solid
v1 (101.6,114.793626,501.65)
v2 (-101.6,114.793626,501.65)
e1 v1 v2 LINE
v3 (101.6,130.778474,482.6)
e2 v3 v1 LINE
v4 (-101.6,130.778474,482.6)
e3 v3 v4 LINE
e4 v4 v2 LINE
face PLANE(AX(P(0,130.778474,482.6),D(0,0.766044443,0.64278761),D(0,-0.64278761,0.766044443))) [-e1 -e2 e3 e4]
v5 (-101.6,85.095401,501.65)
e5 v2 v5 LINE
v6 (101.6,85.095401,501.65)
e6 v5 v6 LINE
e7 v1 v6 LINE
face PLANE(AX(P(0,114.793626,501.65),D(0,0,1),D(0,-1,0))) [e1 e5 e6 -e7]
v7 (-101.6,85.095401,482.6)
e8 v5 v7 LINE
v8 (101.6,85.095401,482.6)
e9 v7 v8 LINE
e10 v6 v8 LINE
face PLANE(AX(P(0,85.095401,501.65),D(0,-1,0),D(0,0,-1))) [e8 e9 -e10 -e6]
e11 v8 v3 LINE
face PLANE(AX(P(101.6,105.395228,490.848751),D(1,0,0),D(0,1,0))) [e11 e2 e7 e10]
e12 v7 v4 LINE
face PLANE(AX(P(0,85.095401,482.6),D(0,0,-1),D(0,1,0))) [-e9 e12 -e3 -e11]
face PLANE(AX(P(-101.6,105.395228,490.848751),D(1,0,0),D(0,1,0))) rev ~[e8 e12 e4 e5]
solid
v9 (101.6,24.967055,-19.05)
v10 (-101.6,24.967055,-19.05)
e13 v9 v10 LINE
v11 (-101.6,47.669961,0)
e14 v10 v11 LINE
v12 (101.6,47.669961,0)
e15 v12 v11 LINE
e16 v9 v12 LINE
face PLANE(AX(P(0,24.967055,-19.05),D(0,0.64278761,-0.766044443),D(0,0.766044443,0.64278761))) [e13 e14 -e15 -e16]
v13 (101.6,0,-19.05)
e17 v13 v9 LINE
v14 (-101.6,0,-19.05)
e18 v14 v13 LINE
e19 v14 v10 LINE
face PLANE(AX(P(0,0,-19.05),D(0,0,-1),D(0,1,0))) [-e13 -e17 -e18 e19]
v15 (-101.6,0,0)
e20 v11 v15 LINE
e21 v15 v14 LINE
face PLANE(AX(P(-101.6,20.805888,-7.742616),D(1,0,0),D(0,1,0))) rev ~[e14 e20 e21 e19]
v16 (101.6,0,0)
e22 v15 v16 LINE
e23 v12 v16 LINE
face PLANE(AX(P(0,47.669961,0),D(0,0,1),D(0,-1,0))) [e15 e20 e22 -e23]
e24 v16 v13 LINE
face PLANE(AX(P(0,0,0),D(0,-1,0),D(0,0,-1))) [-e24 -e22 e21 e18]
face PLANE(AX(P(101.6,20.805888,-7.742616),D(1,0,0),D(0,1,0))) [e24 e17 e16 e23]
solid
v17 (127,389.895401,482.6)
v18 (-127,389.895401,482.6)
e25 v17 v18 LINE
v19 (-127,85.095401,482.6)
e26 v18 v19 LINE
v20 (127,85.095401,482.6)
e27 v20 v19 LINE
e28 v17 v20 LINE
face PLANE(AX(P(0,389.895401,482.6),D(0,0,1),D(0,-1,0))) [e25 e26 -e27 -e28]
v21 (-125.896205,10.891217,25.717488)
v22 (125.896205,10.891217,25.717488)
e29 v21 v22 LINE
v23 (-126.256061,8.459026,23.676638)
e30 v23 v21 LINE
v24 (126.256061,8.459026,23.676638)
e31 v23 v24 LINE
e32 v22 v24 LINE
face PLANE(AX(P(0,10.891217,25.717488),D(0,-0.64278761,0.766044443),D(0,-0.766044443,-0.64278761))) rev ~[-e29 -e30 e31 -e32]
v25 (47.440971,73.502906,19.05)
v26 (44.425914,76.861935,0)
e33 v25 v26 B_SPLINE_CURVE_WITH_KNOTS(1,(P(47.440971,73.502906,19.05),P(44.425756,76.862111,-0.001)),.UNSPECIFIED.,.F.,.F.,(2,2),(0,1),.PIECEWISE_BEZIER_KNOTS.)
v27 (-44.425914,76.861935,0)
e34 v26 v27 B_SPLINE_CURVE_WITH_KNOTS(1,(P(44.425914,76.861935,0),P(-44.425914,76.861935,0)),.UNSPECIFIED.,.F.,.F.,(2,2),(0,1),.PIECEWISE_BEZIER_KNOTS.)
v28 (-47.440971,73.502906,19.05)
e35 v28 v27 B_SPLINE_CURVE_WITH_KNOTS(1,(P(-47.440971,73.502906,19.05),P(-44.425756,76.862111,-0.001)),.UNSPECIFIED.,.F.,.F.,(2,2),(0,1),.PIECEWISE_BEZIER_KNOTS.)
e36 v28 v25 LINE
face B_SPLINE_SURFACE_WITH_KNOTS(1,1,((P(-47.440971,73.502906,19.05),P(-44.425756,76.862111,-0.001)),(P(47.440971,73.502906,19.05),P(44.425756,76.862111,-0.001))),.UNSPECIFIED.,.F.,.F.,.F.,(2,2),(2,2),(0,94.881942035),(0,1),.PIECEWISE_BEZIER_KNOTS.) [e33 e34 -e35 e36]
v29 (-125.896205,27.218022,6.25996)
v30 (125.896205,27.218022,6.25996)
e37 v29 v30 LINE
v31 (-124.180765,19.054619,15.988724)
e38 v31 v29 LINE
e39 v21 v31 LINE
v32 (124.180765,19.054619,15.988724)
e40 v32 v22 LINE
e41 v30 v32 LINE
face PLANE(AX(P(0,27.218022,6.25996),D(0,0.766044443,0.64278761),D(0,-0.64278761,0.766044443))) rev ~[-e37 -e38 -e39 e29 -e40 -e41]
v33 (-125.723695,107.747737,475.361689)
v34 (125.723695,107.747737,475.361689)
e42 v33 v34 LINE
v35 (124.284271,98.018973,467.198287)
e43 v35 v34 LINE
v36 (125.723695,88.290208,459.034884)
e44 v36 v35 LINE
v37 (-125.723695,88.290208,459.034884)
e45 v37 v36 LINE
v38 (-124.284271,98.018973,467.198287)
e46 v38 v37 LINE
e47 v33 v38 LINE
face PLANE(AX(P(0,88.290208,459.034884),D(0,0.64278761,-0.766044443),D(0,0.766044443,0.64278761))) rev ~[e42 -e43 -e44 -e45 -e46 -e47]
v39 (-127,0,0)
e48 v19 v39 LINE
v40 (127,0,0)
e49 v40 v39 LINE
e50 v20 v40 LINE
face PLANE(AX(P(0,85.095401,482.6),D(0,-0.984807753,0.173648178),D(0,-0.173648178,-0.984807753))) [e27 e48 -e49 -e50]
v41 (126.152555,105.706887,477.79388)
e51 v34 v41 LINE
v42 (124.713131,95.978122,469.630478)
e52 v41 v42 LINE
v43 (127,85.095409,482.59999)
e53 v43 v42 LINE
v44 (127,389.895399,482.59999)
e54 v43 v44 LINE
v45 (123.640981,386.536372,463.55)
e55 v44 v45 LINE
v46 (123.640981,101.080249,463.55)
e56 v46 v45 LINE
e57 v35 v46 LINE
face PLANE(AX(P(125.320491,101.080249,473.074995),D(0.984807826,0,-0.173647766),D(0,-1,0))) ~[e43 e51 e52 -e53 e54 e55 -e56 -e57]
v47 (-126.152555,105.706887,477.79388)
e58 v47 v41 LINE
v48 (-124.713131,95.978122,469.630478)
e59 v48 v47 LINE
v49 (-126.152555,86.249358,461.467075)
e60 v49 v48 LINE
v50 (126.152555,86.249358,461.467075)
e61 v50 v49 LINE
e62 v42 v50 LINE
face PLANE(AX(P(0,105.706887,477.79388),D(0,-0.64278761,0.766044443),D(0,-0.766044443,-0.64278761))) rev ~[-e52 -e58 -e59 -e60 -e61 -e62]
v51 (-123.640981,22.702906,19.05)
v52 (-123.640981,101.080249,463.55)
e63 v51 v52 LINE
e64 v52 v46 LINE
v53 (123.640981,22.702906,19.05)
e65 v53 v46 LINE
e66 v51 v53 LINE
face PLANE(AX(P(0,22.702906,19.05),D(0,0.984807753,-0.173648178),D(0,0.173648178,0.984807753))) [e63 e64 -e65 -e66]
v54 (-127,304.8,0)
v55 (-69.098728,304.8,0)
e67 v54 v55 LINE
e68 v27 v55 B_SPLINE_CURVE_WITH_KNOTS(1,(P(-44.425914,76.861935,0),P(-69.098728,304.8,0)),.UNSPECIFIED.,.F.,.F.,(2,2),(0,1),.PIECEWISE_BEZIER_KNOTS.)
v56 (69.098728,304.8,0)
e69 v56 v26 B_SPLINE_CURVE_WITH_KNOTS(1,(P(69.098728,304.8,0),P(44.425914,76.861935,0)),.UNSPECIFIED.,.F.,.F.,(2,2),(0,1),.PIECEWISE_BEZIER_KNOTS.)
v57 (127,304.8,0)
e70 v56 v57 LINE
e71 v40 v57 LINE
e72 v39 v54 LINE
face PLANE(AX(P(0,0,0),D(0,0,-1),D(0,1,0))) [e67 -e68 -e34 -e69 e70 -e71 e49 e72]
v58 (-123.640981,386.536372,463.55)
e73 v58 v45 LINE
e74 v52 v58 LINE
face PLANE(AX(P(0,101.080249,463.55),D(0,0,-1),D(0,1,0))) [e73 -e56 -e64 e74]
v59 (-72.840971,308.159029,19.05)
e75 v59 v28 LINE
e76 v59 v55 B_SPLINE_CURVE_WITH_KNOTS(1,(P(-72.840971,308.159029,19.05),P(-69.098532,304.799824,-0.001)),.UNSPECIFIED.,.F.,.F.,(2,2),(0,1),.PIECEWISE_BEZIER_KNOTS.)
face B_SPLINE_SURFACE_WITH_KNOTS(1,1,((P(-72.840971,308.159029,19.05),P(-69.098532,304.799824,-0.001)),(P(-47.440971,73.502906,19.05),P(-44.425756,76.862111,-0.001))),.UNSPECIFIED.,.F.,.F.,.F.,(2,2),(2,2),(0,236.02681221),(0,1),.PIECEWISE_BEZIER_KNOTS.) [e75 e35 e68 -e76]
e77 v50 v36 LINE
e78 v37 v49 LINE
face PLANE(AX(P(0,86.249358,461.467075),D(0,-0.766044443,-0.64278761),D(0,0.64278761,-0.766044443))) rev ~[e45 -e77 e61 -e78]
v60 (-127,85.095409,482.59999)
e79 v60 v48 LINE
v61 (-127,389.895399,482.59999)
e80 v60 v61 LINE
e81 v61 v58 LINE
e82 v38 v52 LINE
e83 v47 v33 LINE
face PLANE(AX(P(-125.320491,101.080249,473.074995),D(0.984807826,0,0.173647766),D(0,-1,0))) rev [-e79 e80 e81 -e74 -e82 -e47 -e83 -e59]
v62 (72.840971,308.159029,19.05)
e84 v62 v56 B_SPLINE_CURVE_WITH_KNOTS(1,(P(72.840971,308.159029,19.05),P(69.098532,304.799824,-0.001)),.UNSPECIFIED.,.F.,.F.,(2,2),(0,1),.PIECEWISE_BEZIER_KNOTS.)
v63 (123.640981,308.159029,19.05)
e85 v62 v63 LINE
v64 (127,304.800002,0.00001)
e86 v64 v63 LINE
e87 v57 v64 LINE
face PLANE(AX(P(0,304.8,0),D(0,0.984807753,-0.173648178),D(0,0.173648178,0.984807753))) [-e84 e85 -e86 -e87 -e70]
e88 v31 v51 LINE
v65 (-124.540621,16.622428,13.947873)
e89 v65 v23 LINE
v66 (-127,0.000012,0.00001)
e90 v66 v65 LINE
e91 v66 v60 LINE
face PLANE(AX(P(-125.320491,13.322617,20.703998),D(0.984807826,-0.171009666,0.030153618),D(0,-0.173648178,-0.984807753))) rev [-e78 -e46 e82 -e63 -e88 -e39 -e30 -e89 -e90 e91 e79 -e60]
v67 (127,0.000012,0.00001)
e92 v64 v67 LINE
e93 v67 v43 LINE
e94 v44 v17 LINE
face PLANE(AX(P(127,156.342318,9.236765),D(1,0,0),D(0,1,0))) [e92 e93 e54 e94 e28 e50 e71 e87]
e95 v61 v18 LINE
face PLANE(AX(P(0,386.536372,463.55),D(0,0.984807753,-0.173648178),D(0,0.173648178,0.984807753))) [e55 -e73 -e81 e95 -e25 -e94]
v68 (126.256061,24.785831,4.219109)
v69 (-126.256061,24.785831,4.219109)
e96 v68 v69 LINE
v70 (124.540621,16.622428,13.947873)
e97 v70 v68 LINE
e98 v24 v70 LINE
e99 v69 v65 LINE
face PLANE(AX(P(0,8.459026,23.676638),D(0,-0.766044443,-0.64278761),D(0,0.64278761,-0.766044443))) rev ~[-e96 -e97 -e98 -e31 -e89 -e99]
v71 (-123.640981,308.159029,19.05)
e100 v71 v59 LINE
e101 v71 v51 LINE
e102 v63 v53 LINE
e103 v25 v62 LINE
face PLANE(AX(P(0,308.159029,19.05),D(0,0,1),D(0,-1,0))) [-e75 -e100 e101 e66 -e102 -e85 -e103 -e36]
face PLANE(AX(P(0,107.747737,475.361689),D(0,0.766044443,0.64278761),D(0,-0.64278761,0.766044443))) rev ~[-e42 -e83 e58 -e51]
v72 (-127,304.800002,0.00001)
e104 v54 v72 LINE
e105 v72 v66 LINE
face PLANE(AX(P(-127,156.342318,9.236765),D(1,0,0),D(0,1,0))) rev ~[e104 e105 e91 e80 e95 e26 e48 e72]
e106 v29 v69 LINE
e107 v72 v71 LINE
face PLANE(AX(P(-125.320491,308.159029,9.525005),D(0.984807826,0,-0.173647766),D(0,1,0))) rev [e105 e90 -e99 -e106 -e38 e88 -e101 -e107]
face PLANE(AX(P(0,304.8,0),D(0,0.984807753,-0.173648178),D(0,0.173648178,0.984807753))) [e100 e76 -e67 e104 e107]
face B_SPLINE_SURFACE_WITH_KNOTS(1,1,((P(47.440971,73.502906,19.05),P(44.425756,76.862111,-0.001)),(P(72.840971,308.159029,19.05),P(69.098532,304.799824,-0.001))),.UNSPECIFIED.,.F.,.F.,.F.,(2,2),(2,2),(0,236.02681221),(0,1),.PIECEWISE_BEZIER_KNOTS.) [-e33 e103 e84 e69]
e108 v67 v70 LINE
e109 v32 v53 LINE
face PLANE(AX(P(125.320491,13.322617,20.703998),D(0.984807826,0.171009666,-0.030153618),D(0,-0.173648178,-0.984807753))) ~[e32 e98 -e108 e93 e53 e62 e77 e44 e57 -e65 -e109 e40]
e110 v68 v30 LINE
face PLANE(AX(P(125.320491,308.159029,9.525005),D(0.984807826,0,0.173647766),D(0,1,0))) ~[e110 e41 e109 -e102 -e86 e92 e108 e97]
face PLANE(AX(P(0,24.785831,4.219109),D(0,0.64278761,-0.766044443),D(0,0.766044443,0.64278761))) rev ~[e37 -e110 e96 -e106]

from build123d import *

# Parameters (mm, degrees)
F1_DEPTH      = 127
F2_SIZE2      = 3.359019
F2_SIZE       = 19.04999
F3_SIZE2      = 3.359019
F3_SIZE       = 19.04999
F5_DEPTH      = 19.051
F5_TAPER      = 10
F7_DEPTH      = 127.0010001
F7_DEPTH_BACK = 127.0010001
F9_DEPTH      = 101.6


# Not quite as in the source:
# - a fillet or chamfer is up to 0.001 mm smaller than in the source, because OpenCascade refuses the exact size


with BuildPart() as f1:
    # F0 (on Right) → F1 (new body, symmetric)
    with BuildSketch(Plane.YZ):
        Polygon((22.7029059389, 19.05), (0, 0), (304.8, 0), (308.1590289825, 19.05), align=None)
        Polygon((85.0954008899, 482.6), (0, 0), (22.7029059389, 19.05), (101.0802488638, 463.55), align=None)
        Polygon((389.8954008899, 482.6), (85.0954008899, 482.6), (101.0802488638, 463.55), (386.5363719074, 463.55), align=None)
    extrude(amount=F1_DEPTH, both=True)

    # F2 (size 19.05 and 3.3590289825 in the source; OpenCascade refuses exactly that, so slightly less here)
    f2_edges = [f1.edges().sort_by_distance(p)[0] for p in [
        (127, 243.80831, 463.55),
        (127, 61.891577, 241.3),
        (127, 165.430967, 19.05),
    ]]
    f2_side = f1.faces().sort_by_distance((127, 152.4, 6.204202))[0]
    chamfer(f2_edges, length=F2_SIZE, length2=F2_SIZE2, reference=f2_side)

    # F3 (size 19.05 and 3.3590289825 in the source; OpenCascade refuses exactly that, so slightly less here)
    f3_edges = [f1.edges().sort_by_distance(p)[0] for p in [
        (-127, 243.80831, 463.55),
        (-127, 61.891577, 241.3),
        (-127, 165.430967, 19.05),
    ]]
    f3_side = f1.faces().sort_by_distance((-127, 152.4, 6.204202))[0]
    chamfer(f3_edges, length=F3_SIZE, length2=F3_SIZE2, reference=f3_side)

    # F4 (on face) → F5 (cut, through all)
    with BuildSketch(Plane.XY.offset(19.05)):
        Polygon((47.4409710175, 73.5029059389), (72.8409710175, 308.1590289825), (0, 308.1590289825), (-72.8409710175, 308.1590289825), (-47.4409710175, 73.5029059389), (0, 73.5029059389), align=None)
    extrude(amount=-F5_DEPTH, taper=F5_TAPER, mode=Mode.SUBTRACT)

    # F6 (on Right) → F7 (cut, two sides)
    with BuildSketch(Plane.YZ) as f7_sk:
        Polygon((86.2493577843, 461.4670751242), (88.2902084451, 459.0348840173), (107.7477373003, 475.3616893034), (105.7068866396, 477.7938804103), align=None)
        Polygon((27.2180219216, 6.2599595813), (10.8912166355, 25.7174884365), (8.4590255286, 23.6766377757), (24.7858308147, 4.2191089205), align=None)
    extrude(amount=-F7_DEPTH, mode=Mode.SUBTRACT)
    extrude(f7_sk.sketch, amount=F7_DEPTH_BACK, mode=Mode.SUBTRACT)


with BuildPart() as f9:
    # F8 (on Right) → F9 (new body, symmetric)
    with BuildSketch(Plane.YZ):
        Polygon((114.7936259095, 501.65), (85.0954008899, 501.65), (85.0954008899, 482.6), (130.7784738835, 482.6), align=None)
    extrude(amount=F9_DEPTH, both=True)


with BuildPart() as f9b:
    # F8 (on Right) → F9, piece 2 (new body, symmetric)
    with BuildSketch(Plane.YZ):
        Polygon((47.6699605102, 0), (0, 0), (0, -19.05), (24.9670545713, -19.05), align=None)
    extrude(amount=F9_DEPTH, both=True)


solid = Compound([f1.part, f9.part, f9b.part])
